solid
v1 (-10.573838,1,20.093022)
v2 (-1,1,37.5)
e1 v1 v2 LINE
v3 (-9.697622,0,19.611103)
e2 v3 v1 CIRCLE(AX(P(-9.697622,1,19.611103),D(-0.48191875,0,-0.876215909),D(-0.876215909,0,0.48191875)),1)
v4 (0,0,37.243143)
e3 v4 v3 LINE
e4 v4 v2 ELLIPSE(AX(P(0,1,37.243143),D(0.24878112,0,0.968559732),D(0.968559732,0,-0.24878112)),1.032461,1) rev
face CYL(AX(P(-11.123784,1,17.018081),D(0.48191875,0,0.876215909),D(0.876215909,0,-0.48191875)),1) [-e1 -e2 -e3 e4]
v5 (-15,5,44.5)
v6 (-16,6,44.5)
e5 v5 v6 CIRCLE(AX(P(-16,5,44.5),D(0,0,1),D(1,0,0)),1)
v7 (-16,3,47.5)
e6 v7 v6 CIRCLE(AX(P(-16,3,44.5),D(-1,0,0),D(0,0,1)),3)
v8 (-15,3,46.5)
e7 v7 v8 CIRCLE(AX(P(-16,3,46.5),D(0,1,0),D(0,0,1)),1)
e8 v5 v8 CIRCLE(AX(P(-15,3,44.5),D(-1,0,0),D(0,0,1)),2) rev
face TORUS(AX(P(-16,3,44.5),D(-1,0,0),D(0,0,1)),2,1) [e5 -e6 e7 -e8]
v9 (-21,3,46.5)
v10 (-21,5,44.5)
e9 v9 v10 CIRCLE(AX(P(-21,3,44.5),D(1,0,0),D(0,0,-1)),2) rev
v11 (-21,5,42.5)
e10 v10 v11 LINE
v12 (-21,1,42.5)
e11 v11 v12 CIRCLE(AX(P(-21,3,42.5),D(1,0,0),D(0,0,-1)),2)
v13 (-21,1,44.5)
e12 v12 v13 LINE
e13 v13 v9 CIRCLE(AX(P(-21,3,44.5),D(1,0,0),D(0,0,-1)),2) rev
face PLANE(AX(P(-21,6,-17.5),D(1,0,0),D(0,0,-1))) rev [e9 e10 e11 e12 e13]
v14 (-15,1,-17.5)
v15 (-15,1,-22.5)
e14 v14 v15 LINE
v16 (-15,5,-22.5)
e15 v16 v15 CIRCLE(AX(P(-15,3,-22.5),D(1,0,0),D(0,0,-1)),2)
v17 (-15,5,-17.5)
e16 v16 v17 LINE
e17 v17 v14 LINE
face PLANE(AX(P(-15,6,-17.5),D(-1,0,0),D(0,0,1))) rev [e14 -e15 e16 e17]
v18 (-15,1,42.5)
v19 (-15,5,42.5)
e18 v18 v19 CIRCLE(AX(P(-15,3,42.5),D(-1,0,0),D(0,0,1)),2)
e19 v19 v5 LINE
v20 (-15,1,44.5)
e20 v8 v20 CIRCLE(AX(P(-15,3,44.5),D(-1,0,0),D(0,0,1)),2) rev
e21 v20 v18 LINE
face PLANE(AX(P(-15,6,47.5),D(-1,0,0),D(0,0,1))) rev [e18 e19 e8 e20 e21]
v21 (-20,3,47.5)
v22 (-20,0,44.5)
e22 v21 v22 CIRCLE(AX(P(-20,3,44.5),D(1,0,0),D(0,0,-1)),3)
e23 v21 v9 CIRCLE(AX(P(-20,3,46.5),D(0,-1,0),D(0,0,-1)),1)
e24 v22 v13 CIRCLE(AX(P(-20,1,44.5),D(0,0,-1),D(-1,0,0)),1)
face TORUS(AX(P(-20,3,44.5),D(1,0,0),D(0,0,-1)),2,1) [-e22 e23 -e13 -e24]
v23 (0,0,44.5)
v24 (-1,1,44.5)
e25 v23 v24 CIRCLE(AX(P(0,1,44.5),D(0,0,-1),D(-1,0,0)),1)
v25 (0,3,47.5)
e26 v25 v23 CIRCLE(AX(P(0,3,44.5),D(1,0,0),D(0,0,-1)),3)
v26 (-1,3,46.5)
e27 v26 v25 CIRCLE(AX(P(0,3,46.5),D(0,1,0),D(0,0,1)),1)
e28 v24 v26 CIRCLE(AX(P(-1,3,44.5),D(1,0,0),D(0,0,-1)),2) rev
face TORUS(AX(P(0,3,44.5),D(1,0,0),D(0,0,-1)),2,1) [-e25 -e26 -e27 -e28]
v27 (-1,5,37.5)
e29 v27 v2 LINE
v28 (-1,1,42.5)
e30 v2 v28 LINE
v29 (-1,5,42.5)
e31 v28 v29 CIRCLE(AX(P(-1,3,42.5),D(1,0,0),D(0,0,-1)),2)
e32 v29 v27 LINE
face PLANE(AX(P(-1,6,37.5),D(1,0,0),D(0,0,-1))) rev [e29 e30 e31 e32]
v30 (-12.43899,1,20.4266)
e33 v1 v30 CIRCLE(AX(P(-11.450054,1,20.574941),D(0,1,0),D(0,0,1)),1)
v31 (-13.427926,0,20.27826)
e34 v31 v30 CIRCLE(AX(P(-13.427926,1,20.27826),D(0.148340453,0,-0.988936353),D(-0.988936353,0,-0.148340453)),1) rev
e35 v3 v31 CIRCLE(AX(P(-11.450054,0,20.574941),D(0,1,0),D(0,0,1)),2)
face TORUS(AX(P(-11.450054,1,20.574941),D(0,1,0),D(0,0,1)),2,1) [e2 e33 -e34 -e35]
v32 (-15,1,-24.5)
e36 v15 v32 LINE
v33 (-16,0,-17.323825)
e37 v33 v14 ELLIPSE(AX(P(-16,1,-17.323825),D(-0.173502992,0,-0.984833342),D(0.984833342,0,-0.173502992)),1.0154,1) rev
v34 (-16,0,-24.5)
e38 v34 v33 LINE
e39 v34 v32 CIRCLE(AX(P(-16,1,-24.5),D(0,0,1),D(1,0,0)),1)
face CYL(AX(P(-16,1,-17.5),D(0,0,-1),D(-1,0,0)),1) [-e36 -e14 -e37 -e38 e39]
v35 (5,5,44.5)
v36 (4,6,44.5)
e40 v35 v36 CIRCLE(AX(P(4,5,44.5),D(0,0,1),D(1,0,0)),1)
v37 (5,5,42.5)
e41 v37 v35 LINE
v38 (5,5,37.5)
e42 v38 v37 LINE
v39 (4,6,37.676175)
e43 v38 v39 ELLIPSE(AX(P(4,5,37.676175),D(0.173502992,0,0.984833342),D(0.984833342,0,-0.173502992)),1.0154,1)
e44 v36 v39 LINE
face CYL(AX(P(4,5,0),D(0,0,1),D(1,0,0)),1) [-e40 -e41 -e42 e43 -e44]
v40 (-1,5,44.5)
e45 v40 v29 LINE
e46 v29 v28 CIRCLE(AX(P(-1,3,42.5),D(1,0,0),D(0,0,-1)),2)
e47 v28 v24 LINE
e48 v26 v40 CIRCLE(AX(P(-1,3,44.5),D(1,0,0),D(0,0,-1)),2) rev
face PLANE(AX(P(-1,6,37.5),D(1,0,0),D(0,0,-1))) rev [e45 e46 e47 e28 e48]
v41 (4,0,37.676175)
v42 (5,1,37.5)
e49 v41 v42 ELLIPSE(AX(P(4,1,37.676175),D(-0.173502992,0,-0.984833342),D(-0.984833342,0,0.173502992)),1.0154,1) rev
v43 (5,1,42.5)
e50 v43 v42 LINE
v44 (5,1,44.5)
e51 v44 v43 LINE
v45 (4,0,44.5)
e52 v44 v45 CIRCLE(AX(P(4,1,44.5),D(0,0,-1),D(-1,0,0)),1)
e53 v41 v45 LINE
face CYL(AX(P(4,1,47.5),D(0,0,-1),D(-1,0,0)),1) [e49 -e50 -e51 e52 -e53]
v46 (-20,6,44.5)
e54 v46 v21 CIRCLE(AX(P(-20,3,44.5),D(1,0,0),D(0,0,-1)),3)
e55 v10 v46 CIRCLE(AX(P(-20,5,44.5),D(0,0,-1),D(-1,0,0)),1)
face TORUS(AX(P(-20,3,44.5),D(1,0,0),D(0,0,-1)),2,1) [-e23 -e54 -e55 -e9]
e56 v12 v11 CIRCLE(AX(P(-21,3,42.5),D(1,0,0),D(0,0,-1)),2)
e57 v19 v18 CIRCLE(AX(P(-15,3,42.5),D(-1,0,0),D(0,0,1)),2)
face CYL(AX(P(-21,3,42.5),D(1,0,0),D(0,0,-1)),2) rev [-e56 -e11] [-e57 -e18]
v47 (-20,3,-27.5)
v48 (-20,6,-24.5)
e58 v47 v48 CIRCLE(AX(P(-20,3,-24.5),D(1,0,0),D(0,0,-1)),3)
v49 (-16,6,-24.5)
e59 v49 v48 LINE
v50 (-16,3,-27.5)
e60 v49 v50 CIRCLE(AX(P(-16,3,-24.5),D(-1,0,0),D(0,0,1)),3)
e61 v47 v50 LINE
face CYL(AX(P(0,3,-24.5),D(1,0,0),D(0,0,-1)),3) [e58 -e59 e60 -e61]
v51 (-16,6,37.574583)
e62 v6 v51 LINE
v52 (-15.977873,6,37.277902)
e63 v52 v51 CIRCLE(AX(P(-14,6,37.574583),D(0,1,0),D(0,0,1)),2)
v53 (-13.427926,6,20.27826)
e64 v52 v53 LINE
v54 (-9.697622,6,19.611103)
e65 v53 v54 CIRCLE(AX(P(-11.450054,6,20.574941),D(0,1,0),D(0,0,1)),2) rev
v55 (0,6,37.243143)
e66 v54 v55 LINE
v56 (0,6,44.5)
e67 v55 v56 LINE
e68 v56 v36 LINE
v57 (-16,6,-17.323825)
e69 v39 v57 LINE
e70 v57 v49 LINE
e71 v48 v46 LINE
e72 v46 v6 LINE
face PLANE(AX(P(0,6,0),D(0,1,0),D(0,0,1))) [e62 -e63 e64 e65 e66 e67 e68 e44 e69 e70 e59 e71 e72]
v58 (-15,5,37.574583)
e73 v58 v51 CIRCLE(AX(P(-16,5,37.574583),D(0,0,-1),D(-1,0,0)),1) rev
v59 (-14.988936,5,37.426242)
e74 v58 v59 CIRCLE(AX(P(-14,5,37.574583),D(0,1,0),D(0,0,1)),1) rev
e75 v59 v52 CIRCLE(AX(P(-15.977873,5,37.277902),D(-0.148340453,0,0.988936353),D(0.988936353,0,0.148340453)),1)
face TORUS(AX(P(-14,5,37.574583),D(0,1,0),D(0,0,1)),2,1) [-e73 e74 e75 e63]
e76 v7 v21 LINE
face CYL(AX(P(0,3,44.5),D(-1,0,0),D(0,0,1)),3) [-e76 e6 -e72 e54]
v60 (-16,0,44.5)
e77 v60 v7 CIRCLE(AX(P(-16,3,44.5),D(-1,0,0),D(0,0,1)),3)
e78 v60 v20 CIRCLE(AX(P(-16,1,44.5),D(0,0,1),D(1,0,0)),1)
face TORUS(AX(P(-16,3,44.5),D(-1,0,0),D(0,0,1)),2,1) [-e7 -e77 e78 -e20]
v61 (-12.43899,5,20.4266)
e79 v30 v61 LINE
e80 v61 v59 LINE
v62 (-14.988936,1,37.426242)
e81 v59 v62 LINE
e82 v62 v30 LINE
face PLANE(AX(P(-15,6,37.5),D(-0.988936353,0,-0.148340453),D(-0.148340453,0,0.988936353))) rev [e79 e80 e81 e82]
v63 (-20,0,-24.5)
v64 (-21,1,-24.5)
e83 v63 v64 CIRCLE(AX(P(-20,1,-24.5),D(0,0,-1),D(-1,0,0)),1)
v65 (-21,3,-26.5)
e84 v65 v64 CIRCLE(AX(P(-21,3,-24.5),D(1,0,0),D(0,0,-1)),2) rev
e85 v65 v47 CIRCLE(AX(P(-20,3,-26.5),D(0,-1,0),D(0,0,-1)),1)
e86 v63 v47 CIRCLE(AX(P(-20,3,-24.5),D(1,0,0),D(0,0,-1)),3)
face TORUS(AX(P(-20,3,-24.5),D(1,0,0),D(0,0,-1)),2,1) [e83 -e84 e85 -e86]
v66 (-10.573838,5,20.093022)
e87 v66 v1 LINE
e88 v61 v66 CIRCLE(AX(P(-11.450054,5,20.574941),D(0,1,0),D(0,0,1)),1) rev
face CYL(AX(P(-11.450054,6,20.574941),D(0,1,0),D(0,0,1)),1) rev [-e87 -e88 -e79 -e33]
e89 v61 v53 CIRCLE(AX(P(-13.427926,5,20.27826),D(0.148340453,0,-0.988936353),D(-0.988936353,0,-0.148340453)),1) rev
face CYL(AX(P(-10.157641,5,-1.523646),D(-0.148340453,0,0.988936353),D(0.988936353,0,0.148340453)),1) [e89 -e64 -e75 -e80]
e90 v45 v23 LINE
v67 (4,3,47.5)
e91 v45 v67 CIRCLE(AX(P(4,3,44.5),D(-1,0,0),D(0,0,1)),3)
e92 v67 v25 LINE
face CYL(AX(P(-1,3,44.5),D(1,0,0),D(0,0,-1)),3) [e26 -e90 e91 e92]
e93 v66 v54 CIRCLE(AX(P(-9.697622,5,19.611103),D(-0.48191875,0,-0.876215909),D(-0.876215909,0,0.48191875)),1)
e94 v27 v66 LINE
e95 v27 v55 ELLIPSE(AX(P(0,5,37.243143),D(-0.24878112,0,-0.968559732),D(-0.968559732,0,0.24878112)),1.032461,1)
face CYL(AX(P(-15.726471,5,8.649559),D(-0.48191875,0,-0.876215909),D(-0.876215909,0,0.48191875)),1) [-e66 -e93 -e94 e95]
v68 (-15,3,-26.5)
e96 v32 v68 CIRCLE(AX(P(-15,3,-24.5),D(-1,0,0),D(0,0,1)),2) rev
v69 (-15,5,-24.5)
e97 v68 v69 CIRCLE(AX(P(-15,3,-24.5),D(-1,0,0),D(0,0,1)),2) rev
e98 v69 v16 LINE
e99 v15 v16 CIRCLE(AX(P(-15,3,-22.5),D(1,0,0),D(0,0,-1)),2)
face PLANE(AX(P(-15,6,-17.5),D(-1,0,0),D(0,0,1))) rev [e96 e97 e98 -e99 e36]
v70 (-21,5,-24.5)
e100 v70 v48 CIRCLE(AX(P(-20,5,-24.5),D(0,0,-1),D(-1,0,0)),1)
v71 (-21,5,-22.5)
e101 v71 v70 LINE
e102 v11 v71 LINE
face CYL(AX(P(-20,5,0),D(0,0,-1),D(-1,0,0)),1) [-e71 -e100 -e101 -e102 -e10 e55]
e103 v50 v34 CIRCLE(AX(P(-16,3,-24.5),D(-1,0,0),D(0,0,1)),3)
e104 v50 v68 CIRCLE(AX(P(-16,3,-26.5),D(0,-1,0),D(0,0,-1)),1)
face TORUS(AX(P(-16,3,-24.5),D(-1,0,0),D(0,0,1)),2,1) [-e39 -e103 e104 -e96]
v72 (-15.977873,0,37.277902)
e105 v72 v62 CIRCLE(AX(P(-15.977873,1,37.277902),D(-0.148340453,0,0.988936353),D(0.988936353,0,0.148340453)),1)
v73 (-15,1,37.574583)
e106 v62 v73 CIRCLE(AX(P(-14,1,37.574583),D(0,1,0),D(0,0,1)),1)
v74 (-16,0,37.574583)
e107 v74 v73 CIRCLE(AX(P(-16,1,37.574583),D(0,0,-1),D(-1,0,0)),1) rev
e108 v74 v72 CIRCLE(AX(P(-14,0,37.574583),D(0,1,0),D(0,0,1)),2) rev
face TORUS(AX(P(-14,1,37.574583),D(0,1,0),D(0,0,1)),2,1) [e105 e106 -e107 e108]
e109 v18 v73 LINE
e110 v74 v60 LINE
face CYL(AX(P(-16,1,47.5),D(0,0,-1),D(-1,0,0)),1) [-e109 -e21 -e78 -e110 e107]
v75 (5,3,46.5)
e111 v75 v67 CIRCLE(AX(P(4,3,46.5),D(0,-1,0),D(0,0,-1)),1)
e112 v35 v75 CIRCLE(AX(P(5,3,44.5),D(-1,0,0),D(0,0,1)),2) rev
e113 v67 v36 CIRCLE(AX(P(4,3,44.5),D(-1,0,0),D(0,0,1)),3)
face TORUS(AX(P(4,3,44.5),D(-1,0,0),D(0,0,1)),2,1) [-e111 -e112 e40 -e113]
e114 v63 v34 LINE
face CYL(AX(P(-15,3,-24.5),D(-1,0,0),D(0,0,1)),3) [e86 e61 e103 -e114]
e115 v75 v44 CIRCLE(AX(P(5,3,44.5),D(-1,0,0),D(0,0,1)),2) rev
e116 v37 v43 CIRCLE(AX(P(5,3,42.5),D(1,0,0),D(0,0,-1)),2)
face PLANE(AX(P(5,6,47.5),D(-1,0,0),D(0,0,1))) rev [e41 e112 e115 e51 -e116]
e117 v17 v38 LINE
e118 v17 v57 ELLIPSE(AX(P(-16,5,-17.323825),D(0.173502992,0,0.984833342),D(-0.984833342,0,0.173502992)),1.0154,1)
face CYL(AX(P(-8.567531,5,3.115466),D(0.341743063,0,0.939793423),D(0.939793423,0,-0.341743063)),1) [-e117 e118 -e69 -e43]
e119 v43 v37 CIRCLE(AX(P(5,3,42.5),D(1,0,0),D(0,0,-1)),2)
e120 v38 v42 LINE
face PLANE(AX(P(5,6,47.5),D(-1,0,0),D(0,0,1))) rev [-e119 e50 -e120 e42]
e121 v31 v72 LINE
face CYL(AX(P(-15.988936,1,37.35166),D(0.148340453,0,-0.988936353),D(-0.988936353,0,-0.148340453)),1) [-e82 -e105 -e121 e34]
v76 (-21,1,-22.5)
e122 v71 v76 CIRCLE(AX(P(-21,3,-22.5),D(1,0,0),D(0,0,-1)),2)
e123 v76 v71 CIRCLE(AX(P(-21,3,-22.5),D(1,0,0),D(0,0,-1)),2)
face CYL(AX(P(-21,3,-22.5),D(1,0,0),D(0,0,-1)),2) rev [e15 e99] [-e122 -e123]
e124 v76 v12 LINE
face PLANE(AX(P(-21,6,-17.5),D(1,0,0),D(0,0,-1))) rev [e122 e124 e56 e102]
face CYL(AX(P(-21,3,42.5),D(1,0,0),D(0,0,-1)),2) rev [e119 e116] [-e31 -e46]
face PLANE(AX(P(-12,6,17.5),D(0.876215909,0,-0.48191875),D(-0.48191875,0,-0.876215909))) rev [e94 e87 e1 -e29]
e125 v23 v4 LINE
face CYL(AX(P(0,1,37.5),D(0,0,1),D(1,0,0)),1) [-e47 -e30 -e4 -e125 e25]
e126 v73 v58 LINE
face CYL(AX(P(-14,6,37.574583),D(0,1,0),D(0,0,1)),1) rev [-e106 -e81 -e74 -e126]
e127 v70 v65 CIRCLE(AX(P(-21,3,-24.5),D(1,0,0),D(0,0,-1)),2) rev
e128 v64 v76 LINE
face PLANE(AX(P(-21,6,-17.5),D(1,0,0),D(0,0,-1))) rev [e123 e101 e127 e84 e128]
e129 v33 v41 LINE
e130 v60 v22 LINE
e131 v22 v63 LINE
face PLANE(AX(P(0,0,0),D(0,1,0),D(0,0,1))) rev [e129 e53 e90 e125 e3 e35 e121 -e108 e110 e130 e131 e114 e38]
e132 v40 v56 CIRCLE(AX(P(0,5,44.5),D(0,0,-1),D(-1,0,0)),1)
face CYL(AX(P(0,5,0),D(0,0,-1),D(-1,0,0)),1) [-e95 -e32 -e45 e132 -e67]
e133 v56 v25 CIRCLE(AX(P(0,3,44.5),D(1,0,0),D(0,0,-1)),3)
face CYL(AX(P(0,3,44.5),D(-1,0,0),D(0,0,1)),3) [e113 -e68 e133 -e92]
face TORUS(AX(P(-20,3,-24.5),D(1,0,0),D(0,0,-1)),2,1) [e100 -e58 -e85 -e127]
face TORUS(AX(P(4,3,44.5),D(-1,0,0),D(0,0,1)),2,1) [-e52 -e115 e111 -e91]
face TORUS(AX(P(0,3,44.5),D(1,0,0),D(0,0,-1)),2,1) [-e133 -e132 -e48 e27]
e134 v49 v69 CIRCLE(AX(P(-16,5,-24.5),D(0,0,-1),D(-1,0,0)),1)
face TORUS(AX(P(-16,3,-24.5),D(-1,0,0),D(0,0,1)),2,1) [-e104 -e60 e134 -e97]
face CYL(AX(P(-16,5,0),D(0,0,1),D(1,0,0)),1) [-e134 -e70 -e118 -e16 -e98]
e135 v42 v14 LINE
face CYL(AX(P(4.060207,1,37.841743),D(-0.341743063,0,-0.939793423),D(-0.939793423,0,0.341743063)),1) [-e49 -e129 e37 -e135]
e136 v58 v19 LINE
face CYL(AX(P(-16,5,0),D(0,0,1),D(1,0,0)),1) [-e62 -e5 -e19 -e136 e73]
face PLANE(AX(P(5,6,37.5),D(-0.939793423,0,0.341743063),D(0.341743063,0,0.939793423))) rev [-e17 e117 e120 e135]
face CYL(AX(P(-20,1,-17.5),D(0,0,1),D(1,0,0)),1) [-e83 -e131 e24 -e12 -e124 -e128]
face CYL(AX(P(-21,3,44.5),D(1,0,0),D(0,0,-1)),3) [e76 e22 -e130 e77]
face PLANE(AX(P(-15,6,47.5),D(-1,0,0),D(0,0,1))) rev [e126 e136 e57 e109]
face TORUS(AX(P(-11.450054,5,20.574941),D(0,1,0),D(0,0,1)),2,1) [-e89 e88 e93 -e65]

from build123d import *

# Parameters (mm, degrees)
BOSS_EXTRUDE1_DEPTH = 6
SKETCH3_R           = 2
CUT_EXTRUDE1_DEPTH  = 55.481648286
SKETCH4_R           = 2
CUT_EXTRUDE2_DEPTH  = 52.886896226
FILLET1_R           = 3
FILLET2_R           = 1


with BuildPart() as part:
    # Sketch2 → Boss-Extrude1 (new body)
    with BuildSketch(Plane(origin=(0, 0, 0), x_dir=(1, 0, 0), z_dir=(0, 1, 0))):
        Polygon((-21, 17.5), (-21, -47.5), (-15, -47.5), (-15, -37.5), (-12, -17.5), (-1, -37.5), (-1, -47.5), (5, -47.5), (5, -37.5), (-15, 17.5), (-15, 27.5), (-21, 27.5), align=None)
    extrude(amount=BOSS_EXTRUDE1_DEPTH)

    # Sketch3 → Cut-Extrude1 (cut, through all)
    with BuildSketch(Plane(origin=(5, 0, 0), x_dir=(0, 0, -1), z_dir=(1, 0, 0))):
        with Locations((-42.5, 3)):
            Circle(SKETCH3_R)
    extrude(amount=-CUT_EXTRUDE1_DEPTH, mode=Mode.SUBTRACT)

    # Sketch4 → Cut-Extrude2 (cut, through all)
    with BuildSketch(Plane(origin=(-15, 0, 0), x_dir=(0, 0, -1), z_dir=(1, 0, 0))):
        with Locations((22.5, 3)):
            Circle(SKETCH4_R)
    extrude(amount=-CUT_EXTRUDE2_DEPTH, mode=Mode.SUBTRACT)

    # Fillet1
    fillet1_edges = [part.edges().sort_by_distance(p)[0] for p in [
        (-18, 0, -27.5),
        (-18, 6, -27.5),
        (2, 0, 47.5),
        (2, 6, 47.5),
        (-18, 0, 47.5),
        (-18, 6, 47.5),
    ]]
    fillet(fillet1_edges, radius=FILLET1_R - 0.0001)  # a hair under: the kernel refuses the full size

    # Fillet2
    fillet2_edges = [part.edges().sort_by_distance(p)[0] for p in [
        (-15, 0, -21.00005),
        (-5, 0, 10),
        (-1, 0, 41.00005),
        (-6.5, 0, 27.5),
        (-13.5, 0, 27.5),
        (-13.5, 6, 27.5),
        (-12, 3, 17.5),
        (-15, 3, 37.5),
        (-6.5, 6, 27.5),
        (-1, 6, 41.00005),
        (-5, 6, 10),
        (-15, 6, -21.00005),
        (-21, 0, 10),
        (-21, 6, 10),
        (-21, 5.121349633, 46.621349633),
        (-21, 0.878650367, 46.621349633),
        (-21, 5.121349633, -26.621349633),
        (-21, 0.878650367, -26.621349633),
        (5, 0, 41.00005),
        (-15, 0, 41.00005),
        (-15, 5.121349633, -26.621349633),
        (-15, 0.878650367, -26.621349633),
        (-15, 6, 41.00005),
        (5, 6, 41.00005),
        (5, 5.121349633, 46.621349633),
        (5, 0.878650367, 46.621349633),
        (-1, 5.121349633, 46.621349633),
        (-1, 0.878650367, 46.621349633),
        (-15, 5.121349633, 46.621349633),
        (-15, 0.878650367, 46.621349633),
    ]]
    fillet(fillet2_edges, radius=FILLET2_R - 0.0001)  # a hair under: the kernel refuses the full size


solid = part.part
